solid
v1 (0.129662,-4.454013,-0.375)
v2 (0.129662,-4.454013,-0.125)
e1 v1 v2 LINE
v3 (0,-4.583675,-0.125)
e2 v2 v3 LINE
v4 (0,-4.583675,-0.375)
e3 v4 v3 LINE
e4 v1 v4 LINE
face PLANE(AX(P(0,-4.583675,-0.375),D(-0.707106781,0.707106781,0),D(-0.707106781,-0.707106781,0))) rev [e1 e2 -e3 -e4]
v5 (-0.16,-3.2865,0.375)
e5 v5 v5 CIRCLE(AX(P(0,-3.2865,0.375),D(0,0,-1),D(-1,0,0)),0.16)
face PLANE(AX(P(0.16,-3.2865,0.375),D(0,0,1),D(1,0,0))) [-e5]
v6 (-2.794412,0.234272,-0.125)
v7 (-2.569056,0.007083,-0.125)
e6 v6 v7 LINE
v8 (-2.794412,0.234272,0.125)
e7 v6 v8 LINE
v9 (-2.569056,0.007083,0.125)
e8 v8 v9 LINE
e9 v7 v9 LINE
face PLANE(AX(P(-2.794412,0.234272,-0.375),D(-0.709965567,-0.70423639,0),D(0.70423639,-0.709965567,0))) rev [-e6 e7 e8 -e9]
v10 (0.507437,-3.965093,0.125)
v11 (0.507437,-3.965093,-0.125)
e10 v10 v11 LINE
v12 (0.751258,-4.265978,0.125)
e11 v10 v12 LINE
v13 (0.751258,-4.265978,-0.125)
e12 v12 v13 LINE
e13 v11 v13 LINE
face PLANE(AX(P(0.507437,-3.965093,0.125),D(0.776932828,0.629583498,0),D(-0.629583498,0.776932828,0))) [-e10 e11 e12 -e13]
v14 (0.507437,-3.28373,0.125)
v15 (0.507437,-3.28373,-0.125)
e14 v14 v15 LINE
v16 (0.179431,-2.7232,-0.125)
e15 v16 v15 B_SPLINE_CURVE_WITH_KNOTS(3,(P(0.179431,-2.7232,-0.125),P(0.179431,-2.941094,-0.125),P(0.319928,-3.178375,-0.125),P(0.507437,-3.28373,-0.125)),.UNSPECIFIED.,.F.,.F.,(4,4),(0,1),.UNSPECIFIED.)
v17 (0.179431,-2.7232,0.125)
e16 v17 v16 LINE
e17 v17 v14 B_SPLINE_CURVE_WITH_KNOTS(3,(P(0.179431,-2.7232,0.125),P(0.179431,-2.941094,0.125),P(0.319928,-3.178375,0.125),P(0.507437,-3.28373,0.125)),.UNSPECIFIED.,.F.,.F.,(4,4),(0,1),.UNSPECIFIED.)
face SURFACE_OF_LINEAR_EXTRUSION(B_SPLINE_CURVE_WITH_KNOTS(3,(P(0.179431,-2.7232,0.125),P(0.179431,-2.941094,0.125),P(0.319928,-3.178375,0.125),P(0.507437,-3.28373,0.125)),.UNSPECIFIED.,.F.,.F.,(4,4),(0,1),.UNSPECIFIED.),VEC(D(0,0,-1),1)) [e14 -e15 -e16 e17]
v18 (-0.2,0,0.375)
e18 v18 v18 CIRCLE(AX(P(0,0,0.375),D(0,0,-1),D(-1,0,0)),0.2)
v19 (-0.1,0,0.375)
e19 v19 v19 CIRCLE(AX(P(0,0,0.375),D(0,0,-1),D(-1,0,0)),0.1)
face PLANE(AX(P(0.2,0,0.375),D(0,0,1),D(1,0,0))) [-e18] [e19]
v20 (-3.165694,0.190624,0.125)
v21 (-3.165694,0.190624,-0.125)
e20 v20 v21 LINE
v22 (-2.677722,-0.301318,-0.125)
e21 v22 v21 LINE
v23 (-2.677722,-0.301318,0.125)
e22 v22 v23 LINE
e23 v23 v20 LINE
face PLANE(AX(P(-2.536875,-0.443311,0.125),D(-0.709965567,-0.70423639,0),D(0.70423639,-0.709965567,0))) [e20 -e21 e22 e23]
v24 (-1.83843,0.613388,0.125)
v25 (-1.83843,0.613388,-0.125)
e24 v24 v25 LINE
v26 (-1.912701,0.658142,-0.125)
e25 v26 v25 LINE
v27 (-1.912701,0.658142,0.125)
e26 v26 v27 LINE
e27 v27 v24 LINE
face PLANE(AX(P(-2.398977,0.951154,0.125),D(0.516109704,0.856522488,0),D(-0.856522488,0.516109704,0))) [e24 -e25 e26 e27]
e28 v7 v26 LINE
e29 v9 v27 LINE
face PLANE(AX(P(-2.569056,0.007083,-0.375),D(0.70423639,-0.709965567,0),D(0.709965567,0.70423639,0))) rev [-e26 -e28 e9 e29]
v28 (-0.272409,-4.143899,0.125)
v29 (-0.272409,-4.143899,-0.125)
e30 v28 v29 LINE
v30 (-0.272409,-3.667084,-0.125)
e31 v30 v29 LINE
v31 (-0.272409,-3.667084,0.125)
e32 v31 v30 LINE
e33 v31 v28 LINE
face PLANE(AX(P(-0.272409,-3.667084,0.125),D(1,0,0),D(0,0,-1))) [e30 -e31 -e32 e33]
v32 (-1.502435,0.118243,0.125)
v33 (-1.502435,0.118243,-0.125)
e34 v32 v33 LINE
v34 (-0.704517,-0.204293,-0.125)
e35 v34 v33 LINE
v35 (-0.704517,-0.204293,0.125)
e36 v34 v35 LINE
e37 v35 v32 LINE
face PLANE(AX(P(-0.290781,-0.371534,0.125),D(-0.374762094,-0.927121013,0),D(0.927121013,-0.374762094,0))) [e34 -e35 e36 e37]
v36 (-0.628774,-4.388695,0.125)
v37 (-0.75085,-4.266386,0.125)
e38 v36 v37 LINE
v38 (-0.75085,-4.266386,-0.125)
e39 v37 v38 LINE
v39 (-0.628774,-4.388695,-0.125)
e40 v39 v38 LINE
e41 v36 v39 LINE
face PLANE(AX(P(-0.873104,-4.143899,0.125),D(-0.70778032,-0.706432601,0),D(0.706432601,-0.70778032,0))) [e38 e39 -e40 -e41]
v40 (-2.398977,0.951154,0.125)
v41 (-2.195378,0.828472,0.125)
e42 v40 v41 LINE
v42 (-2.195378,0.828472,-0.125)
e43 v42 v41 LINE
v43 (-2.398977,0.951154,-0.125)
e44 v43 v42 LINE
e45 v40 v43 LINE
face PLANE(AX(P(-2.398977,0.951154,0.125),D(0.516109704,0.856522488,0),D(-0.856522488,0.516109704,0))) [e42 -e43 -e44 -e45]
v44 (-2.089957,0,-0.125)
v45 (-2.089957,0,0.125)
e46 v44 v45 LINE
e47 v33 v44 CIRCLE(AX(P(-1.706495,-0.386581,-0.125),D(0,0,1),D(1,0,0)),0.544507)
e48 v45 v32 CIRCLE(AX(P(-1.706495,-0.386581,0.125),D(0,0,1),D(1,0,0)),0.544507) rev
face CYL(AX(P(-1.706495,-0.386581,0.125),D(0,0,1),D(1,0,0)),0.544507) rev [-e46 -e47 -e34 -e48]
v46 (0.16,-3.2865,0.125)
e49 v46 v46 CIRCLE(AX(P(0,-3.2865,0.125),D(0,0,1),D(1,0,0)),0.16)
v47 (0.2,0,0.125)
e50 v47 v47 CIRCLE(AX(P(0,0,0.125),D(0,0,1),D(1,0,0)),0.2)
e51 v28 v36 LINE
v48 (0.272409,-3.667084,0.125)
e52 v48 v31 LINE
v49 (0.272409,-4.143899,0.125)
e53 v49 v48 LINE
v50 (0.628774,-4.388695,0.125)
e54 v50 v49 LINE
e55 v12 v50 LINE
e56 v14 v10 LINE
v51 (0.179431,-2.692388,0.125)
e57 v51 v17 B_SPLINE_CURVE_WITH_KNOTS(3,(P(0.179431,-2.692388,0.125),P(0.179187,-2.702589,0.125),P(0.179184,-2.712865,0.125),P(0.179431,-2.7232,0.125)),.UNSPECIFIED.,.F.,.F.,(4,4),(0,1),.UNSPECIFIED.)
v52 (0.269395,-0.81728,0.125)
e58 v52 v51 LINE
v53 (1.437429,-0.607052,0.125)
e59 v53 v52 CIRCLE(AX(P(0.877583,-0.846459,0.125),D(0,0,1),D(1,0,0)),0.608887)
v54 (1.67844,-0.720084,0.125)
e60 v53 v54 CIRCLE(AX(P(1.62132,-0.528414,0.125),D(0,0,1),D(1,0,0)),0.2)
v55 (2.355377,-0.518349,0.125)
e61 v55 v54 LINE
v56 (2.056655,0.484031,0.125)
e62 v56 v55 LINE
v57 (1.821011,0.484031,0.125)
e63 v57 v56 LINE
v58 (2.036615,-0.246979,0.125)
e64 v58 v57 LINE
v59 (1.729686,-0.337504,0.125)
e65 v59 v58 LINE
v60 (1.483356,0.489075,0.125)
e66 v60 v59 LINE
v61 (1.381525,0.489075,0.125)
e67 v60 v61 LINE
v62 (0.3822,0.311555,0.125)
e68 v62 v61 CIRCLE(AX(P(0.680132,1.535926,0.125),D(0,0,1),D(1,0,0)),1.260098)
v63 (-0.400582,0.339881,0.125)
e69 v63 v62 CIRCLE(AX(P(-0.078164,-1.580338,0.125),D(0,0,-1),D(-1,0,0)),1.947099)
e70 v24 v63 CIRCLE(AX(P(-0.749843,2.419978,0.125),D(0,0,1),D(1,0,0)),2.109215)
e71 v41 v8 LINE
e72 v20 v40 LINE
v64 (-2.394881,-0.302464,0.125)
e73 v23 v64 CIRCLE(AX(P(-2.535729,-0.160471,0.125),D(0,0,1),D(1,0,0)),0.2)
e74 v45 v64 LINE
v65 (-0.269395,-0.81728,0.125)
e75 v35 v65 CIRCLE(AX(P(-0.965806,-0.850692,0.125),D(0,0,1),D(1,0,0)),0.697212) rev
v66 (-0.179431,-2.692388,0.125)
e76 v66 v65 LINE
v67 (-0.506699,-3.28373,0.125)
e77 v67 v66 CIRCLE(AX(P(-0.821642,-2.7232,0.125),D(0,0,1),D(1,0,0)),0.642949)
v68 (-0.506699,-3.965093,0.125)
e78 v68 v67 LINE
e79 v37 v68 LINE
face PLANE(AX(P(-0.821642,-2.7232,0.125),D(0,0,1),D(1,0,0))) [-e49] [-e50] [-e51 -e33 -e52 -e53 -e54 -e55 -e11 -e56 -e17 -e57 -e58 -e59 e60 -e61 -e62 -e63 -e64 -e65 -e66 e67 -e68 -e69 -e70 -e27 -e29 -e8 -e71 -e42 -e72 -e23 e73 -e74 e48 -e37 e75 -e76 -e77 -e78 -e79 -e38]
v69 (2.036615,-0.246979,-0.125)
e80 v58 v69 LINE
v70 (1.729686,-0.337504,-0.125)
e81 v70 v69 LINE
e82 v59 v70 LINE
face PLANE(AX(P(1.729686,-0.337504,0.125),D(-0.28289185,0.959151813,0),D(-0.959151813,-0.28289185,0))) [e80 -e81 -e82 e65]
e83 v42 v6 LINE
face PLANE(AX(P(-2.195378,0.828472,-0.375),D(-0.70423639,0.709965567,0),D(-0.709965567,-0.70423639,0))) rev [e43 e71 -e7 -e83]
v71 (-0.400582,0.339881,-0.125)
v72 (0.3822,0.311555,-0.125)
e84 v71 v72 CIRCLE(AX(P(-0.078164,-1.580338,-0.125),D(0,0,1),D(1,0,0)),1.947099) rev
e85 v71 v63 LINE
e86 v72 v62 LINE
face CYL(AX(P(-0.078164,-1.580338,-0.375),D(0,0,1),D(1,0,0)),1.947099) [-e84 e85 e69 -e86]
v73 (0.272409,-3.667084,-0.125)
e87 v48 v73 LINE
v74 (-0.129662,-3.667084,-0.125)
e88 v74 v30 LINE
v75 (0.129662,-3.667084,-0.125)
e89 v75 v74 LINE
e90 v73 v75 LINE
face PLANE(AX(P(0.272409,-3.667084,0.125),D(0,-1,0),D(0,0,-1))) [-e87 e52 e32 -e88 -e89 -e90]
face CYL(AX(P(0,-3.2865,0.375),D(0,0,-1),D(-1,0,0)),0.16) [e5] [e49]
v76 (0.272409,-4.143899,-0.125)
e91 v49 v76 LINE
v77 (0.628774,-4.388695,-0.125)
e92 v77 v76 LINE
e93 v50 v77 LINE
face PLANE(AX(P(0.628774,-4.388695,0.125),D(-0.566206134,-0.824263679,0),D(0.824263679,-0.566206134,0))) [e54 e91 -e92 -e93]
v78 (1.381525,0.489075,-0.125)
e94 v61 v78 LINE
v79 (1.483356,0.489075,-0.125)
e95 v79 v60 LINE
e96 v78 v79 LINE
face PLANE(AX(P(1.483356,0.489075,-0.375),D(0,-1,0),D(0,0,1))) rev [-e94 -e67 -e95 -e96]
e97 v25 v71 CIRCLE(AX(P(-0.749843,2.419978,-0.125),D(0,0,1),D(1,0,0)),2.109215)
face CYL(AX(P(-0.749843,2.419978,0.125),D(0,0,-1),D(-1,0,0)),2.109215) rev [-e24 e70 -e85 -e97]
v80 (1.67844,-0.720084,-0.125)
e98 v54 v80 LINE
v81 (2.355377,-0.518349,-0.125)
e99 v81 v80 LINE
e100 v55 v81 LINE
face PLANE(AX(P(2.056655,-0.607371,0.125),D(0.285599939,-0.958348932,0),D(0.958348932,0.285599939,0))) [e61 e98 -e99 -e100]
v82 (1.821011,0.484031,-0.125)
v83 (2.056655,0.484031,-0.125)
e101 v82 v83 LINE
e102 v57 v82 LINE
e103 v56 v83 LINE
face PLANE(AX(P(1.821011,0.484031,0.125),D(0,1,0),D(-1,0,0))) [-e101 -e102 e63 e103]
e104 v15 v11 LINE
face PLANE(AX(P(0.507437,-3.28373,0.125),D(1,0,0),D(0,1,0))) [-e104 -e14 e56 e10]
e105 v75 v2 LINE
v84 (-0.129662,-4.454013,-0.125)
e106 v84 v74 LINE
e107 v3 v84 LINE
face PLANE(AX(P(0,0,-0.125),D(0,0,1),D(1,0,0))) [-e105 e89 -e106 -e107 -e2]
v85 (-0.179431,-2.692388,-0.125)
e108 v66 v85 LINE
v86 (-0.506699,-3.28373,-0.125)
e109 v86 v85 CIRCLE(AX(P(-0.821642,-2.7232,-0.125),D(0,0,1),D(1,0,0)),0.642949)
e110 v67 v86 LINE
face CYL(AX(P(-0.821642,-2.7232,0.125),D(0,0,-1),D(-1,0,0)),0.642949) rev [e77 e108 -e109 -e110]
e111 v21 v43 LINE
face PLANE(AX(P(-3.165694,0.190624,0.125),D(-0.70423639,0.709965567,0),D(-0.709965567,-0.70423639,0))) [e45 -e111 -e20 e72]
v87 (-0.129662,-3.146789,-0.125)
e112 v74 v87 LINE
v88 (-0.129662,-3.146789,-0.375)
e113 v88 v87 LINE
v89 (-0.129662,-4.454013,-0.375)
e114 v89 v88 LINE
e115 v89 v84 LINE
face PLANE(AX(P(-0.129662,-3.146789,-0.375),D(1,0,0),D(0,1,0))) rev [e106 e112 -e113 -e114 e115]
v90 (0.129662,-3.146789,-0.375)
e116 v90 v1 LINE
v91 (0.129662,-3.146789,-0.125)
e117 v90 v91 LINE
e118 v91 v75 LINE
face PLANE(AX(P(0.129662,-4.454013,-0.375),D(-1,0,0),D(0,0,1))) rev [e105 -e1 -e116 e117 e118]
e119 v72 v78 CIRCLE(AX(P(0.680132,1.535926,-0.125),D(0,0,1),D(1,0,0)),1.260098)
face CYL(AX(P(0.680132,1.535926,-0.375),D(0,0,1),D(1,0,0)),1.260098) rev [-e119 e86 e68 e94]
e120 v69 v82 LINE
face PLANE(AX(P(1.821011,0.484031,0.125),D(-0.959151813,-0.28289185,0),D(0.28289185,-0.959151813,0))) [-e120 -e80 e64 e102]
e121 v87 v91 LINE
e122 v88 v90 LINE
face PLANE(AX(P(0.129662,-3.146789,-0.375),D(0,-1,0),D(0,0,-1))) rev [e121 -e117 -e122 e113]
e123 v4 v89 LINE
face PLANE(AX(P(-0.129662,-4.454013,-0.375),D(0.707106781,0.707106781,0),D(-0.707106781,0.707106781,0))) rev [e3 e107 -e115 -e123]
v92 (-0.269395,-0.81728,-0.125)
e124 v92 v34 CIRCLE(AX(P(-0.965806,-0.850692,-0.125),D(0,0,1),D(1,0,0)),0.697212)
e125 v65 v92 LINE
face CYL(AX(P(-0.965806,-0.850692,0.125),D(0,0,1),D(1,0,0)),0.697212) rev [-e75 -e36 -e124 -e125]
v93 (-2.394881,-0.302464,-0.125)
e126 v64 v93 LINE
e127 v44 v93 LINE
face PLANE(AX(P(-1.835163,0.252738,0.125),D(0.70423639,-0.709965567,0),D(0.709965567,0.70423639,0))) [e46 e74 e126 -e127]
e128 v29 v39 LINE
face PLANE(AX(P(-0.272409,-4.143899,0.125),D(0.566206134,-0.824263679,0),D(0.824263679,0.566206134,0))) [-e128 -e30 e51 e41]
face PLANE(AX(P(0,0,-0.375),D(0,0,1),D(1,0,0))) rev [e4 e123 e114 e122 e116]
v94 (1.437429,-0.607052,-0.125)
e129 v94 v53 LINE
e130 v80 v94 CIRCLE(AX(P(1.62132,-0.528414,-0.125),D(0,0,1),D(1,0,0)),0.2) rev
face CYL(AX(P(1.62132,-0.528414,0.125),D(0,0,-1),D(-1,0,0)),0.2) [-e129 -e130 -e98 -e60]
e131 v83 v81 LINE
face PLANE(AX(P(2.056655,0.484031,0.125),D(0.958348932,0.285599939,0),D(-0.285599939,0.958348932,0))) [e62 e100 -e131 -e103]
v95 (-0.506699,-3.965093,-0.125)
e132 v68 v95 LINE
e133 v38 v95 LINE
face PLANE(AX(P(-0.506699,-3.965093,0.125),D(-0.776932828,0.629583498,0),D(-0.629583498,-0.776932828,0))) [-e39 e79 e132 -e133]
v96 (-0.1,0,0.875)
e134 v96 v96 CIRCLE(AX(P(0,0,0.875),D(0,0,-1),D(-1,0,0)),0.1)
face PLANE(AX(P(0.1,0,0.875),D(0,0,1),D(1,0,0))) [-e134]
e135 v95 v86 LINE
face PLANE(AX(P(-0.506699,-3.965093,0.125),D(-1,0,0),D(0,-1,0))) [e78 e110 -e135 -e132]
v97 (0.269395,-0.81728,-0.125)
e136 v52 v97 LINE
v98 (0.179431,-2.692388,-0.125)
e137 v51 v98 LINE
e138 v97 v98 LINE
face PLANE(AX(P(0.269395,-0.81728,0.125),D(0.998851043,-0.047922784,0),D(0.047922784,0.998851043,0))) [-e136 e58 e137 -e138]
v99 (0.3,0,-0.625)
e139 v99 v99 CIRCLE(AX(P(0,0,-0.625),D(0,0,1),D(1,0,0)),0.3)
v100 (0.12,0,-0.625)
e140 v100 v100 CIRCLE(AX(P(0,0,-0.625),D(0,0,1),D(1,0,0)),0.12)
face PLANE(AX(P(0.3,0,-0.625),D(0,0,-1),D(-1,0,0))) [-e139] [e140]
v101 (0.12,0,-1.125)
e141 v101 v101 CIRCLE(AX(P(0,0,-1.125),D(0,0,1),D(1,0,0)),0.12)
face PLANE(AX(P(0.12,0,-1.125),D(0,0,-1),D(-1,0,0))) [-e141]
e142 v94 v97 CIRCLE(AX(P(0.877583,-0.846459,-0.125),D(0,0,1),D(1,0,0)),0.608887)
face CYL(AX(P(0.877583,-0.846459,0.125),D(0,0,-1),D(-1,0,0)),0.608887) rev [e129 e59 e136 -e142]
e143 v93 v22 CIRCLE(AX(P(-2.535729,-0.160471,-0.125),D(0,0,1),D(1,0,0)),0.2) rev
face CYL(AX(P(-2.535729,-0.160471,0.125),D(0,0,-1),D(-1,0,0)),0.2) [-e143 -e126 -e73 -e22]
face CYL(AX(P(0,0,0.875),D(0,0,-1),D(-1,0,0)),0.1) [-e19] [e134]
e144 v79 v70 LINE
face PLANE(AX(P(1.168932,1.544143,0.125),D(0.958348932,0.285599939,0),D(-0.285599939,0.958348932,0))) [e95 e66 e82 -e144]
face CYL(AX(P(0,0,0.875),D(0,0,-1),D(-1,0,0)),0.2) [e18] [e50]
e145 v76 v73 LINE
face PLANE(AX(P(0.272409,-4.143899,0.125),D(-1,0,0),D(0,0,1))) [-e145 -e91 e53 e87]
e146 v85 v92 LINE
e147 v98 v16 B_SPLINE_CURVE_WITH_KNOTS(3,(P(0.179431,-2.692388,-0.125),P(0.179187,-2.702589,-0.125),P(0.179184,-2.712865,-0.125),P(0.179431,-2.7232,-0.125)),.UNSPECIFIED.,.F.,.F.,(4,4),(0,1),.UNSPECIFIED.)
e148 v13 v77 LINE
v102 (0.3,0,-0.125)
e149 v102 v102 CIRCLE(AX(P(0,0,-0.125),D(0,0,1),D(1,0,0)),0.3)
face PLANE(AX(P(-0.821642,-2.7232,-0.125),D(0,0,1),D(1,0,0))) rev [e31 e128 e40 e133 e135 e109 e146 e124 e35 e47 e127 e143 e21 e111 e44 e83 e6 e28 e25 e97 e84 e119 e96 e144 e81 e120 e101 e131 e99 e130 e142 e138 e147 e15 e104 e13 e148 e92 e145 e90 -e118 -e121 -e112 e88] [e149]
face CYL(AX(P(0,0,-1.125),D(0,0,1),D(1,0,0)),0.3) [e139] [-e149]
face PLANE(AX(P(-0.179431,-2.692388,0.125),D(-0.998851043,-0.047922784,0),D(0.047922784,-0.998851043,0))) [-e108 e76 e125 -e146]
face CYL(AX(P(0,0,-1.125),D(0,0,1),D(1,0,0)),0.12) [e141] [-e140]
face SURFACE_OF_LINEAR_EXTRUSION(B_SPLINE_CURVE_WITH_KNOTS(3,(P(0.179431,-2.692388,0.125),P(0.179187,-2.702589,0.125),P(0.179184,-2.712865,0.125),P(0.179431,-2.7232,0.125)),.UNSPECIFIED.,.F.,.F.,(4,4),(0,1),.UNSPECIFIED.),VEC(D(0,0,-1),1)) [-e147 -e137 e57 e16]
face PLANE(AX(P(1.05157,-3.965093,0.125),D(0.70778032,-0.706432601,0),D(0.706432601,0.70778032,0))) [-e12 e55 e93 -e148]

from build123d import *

# Parameters (mm, degrees)
BOSS_EXTRUDE1_DEPTH = 0.25
BOSS_EXTRUDE2_DEPTH = 0.25
CUT_EXTRUDE1_DEPTH  = 6.593003707
CUT_EXTRUDE2_DEPTH  = 6.593003707
DRAFT1_ANGLE        = 34.486089424
DRAFT2_ANGLE        = 50.980599525
DRAFT3_ANGLE        = 16.594713156
DRAFT4_ANGLE        = -16.43287546
DRAFT5_ANGLE        = 50.980599525
SKETCH5_W           = 0.16
SKETCH5_H           = 0.25
CHAMFER1_SIZE       = 0.063800239
FILLET1_R           = 0.2
FILLET2_R           = 0.544507155
FILLET3_R           = 0.697211686


with BuildPart() as part:
    # Sketch1 → Boss-Extrude1 (new body)
    with BuildSketch(Plane(origin=(0, 0, -0.125), x_dir=(-1, 0, 0), z_dir=(0, 0, -1))):
        with BuildLine():
            Line((-0.272408935, -3.667083787), (0.272408935, -3.667083787))
            Line((0.272408935, -3.667083787), (0.272408935, -4.143899332))
            Line((0.272408935, -4.143899332), (0.873103994, -4.143899332))
            Line((0.873103994, -4.143899332), (1.051569895, -3.965092957))
            Line((1.051569895, -3.965092957), (0.506698534, -3.965092957))
            Line((0.506698534, -3.965092957), (0.506698534, -3.283729886))
            ThreePointArc((0.506698534, -3.283729886), (0.259096573, -3.03452958), (0.179431493, -2.692387798))
            Line((0.179431493, -2.692387798), (0.290781228, -0.37153351))
            Line((0.290781228, -0.37153351), (1.835162636, 0.252738405))
            Line((1.835162636, 0.252738405), (2.536874566, -0.443310952))
            Line((2.536874566, -0.443310952), (3.165693689, 0.190623805))
            Line((3.165693689, 0.190623805), (2.398976763, 0.95115359))
            Line((2.398976763, 0.95115359), (1.838429548, 0.613387961))
            ThreePointArc((1.838429548, 0.613387961), (0.12624114, 0.405056697), (-1.168932242, 1.544142722))
            Line((-1.168932242, 1.544142722), (-1.729686411, -0.337503893))
            Line((-1.729686411, -0.337503893), (-1.821011369, -0.310568547))
            Line((-1.821011369, -0.310568547), (-1.821011369, 0.484030911))
            Line((-1.821011369, 0.484030911), (-2.056654947, 0.484030911))
            Line((-2.056654947, 0.484030911), (-2.056654947, -0.607371456))
            Line((-2.056654947, -0.607371456), (-1.482657454, -0.77842987))
            ThreePointArc((-1.482657454, -0.77842987), (-0.858095498, -0.237884247), (-0.269395252, -0.817279818))
            Line((-0.269395252, -0.817279818), (-0.179431493, -2.692387798))
            add(Edge.make_bspline(
                [(-0.179431493, -2.723199698), (-0.179183719, -2.712865075), (-0.179186918, -2.702588974), (-0.179431493, -2.692387798)],
                knots=[0, 0, 0, 0, 1, 1, 1, 1], degree=3))
            add(Edge.make_bspline(
                [(-0.507437255, -3.283729886), (-0.319927849, -3.178374639), (-0.179431493, -2.941093516), (-0.179431493, -2.723199698)],
                knots=[0, 0, 0, 0, 1, 1, 1, 1], degree=3))
            Line((-0.507437255, -3.283729886), (-0.507437255, -3.965092957))
            Line((-0.507437255, -3.965092957), (-1.051569895, -3.965092957))
            Line((-1.051569895, -3.965092957), (-0.628774335, -4.388695119))
            Line((-0.628774335, -4.388695119), (-0.272408935, -4.143899332))
            Line((-0.272408935, -4.143899332), (-0.272408935, -3.667083787))
        make_face()
    extrude(amount=-BOSS_EXTRUDE1_DEPTH)

    # Sketch2 → Boss-Extrude2 (add)
    with BuildSketch(Plane(origin=(0, 0, -0.125), x_dir=(-1, 0, 0), z_dir=(0, 0, -1))):
        Polygon((-0.129661741, -3.146789365), (0.129661741, -3.146789365), (0.129661741, -4.454012909), (0, -4.58367465), (-0.129661741, -4.454012909), align=None)
    extrude(amount=BOSS_EXTRUDE2_DEPTH)

    # Sketch3 → Cut-Extrude1 (cut, through all)
    with BuildSketch(Plane.XY.offset(0.125)):
        Polygon((-2.195377886, 0.828472215), (-2.794411885, 0.234272214), (-2.56905624, 0.007083233), (-1.912701402, 0.658141514), align=None)
    extrude(amount=-CUT_EXTRUDE1_DEPTH, mode=Mode.SUBTRACT)

    # Sketch4 → Cut-Extrude2 (cut, through all)
    with BuildSketch(Plane.XY.offset(0.125)):
        with BuildLine():
            Line((1.465134235, 0.550217916), (1.168932242, 1.544142722))
            ThreePointArc((1.168932242, 1.544142722), (0.534119283, 0.746589992), (-0.400581525, 0.339880942))
            ThreePointArc((-0.400581525, 0.339880942), (-0.007751749, 0.365487208), (0.382199804, 0.311554845))
            ThreePointArc((0.382199804, 0.311554845), (0.951331817, 0.305357276), (1.465134235, 0.550217916))
        make_face()
    extrude(amount=-CUT_EXTRUDE2_DEPTH, mode=Mode.SUBTRACT)

    # Draft1
    draft1_faces = [part.faces().sort_by_distance(p)[0] for p in [
        (-0.572756465, -4.143899332, 0),
    ]]
    draft(draft1_faces, Plane(origin=(-0.272408935, -3.667083787, 0.125), x_dir=(0, 0, 1), z_dir=(1, 0, 0)), DRAFT1_ANGLE)

    # Draft2
    draft2_faces = [part.faces().sort_by_distance(p)[0] for p in [
        (-0.779134215, -3.965092957, 0),
    ]]
    draft(draft2_faces, Plane(origin=(-0.506698534, -3.965092957, 0.125), x_dir=(0, -1, 0), z_dir=(-1, 0, 0)), DRAFT2_ANGLE)

    # Draft3
    draft3_faces = [part.faces().sort_by_distance(p)[0] for p in [
        (2.056654947, -0.061670272, 0),
    ]]
    draft(draft3_faces, Plane(origin=(1.821011369, 0.484030911, 0.125), x_dir=(1, 0, 0), z_dir=(0, 1, 0)), DRAFT3_ANGLE)

    # Draft4
    draft4_faces = [part.faces().sort_by_distance(p)[0] for p in [
        (1.821011369, 0.086731182, 0),
    ]]
    draft(draft4_faces, Plane(origin=(1.821011369, 0.484030911, 0.125), x_dir=(1, 0, 0), z_dir=(0, 1, 0)), DRAFT4_ANGLE)

    # Draft5
    draft5_faces = [part.faces().sort_by_distance(p)[0] for p in [
        (0.779503575, -3.965092957, 0),
    ]]
    draft(draft5_faces, Plane(origin=(0.507437255, -3.283729886, 0.125), x_dir=(0, 1, 0), z_dir=(1, 0, 0)), DRAFT5_ANGLE)

    # Sketch5 → Revolve1 (revolve)
    with BuildSketch(Plane.XZ.offset(3.286499627), mode=Mode.PRIVATE) as revolve1_sk:
        with Locations((0.08, 0.25)):
            Rectangle(SKETCH5_W, SKETCH5_H)
    revolve(revolve1_sk.sketch.rotate(Axis((0, -3.286499627, 0.375), (0, 0, -1)), 180), axis=Axis((0, -3.286499627, 0.375), (0, 0, -1)))

    # Sketch6 → Revolve2 (revolve)
    with BuildSketch(Plane.XZ, mode=Mode.PRIVATE) as revolve2_sk:
        Polygon((0.1, 0.875), (0, 0.875), (0, 0.125), (0.2, 0.125), (0.2, 0.375), (0.1, 0.375), align=None)
    revolve(revolve2_sk.sketch.rotate(Axis((0, 0, 0.875), (0, 0, -1)), 180), axis=Axis((0, 0, 0.875), (0, 0, -1)))

    # Sketch7 → Revolve3 (revolve)
    with BuildSketch(Plane(origin=(0, 0, 0), x_dir=(1, 0, 0), z_dir=(0, 1, 0))):
        Polygon((0.12, 1.125), (0, 1.125), (0, 0.125), (0.3, 0.125), (0.3, 0.625), (0.12, 0.625), align=None)
    revolve(axis=Axis((0, 0, -1.125), (0, 0, 1)))

    # Chamfer1
    # the kernel refuses this chamfer: 0.098147605, 0.063800239 mm, written as the material it takes off along each edge
    with BuildSketch(Plane(origin=(1.465134235, 0.550217916, 0.391937228), x_dir=(0.28559993905101894, -0.9583489316600996, 0), z_dir=(0, 0, -1))) as chamfer1_piece_1:
        with BuildLine():
            Line((CHAMFER1_SIZE * 1.00000000412, 0), (0.034717393, 0.097589357))
            ThreePointArc((0.034717393, 0.097589357), (0.018892926, 0.049933601), (0, 0))
            Line((0, 0), (CHAMFER1_SIZE * 1.00000000412, 0))
        make_face()
    extrude(amount=0.783874457, mode=Mode.SUBTRACT)

    # Fillet1
    fillet1_edges = [part.edges().sort_by_distance(p)[0] for p in [
        (1.482657454, -0.77842987, 0),
        (-2.536874566, -0.443310952, 0),
    ]]
    fillet(fillet1_edges, radius=FILLET1_R)

    # Fillet2
    fillet2_edges = [part.edges().sort_by_distance(p)[0] for p in [
        (-1.835162636, 0.252738405, 0),
    ]]
    fillet(fillet2_edges, radius=FILLET2_R)

    # Fillet3
    fillet3_edges = [part.edges().sort_by_distance(p)[0] for p in [
        (-0.290781228, -0.37153351, 0),
    ]]
    fillet(fillet3_edges, radius=FILLET3_R)


solid = part.part
